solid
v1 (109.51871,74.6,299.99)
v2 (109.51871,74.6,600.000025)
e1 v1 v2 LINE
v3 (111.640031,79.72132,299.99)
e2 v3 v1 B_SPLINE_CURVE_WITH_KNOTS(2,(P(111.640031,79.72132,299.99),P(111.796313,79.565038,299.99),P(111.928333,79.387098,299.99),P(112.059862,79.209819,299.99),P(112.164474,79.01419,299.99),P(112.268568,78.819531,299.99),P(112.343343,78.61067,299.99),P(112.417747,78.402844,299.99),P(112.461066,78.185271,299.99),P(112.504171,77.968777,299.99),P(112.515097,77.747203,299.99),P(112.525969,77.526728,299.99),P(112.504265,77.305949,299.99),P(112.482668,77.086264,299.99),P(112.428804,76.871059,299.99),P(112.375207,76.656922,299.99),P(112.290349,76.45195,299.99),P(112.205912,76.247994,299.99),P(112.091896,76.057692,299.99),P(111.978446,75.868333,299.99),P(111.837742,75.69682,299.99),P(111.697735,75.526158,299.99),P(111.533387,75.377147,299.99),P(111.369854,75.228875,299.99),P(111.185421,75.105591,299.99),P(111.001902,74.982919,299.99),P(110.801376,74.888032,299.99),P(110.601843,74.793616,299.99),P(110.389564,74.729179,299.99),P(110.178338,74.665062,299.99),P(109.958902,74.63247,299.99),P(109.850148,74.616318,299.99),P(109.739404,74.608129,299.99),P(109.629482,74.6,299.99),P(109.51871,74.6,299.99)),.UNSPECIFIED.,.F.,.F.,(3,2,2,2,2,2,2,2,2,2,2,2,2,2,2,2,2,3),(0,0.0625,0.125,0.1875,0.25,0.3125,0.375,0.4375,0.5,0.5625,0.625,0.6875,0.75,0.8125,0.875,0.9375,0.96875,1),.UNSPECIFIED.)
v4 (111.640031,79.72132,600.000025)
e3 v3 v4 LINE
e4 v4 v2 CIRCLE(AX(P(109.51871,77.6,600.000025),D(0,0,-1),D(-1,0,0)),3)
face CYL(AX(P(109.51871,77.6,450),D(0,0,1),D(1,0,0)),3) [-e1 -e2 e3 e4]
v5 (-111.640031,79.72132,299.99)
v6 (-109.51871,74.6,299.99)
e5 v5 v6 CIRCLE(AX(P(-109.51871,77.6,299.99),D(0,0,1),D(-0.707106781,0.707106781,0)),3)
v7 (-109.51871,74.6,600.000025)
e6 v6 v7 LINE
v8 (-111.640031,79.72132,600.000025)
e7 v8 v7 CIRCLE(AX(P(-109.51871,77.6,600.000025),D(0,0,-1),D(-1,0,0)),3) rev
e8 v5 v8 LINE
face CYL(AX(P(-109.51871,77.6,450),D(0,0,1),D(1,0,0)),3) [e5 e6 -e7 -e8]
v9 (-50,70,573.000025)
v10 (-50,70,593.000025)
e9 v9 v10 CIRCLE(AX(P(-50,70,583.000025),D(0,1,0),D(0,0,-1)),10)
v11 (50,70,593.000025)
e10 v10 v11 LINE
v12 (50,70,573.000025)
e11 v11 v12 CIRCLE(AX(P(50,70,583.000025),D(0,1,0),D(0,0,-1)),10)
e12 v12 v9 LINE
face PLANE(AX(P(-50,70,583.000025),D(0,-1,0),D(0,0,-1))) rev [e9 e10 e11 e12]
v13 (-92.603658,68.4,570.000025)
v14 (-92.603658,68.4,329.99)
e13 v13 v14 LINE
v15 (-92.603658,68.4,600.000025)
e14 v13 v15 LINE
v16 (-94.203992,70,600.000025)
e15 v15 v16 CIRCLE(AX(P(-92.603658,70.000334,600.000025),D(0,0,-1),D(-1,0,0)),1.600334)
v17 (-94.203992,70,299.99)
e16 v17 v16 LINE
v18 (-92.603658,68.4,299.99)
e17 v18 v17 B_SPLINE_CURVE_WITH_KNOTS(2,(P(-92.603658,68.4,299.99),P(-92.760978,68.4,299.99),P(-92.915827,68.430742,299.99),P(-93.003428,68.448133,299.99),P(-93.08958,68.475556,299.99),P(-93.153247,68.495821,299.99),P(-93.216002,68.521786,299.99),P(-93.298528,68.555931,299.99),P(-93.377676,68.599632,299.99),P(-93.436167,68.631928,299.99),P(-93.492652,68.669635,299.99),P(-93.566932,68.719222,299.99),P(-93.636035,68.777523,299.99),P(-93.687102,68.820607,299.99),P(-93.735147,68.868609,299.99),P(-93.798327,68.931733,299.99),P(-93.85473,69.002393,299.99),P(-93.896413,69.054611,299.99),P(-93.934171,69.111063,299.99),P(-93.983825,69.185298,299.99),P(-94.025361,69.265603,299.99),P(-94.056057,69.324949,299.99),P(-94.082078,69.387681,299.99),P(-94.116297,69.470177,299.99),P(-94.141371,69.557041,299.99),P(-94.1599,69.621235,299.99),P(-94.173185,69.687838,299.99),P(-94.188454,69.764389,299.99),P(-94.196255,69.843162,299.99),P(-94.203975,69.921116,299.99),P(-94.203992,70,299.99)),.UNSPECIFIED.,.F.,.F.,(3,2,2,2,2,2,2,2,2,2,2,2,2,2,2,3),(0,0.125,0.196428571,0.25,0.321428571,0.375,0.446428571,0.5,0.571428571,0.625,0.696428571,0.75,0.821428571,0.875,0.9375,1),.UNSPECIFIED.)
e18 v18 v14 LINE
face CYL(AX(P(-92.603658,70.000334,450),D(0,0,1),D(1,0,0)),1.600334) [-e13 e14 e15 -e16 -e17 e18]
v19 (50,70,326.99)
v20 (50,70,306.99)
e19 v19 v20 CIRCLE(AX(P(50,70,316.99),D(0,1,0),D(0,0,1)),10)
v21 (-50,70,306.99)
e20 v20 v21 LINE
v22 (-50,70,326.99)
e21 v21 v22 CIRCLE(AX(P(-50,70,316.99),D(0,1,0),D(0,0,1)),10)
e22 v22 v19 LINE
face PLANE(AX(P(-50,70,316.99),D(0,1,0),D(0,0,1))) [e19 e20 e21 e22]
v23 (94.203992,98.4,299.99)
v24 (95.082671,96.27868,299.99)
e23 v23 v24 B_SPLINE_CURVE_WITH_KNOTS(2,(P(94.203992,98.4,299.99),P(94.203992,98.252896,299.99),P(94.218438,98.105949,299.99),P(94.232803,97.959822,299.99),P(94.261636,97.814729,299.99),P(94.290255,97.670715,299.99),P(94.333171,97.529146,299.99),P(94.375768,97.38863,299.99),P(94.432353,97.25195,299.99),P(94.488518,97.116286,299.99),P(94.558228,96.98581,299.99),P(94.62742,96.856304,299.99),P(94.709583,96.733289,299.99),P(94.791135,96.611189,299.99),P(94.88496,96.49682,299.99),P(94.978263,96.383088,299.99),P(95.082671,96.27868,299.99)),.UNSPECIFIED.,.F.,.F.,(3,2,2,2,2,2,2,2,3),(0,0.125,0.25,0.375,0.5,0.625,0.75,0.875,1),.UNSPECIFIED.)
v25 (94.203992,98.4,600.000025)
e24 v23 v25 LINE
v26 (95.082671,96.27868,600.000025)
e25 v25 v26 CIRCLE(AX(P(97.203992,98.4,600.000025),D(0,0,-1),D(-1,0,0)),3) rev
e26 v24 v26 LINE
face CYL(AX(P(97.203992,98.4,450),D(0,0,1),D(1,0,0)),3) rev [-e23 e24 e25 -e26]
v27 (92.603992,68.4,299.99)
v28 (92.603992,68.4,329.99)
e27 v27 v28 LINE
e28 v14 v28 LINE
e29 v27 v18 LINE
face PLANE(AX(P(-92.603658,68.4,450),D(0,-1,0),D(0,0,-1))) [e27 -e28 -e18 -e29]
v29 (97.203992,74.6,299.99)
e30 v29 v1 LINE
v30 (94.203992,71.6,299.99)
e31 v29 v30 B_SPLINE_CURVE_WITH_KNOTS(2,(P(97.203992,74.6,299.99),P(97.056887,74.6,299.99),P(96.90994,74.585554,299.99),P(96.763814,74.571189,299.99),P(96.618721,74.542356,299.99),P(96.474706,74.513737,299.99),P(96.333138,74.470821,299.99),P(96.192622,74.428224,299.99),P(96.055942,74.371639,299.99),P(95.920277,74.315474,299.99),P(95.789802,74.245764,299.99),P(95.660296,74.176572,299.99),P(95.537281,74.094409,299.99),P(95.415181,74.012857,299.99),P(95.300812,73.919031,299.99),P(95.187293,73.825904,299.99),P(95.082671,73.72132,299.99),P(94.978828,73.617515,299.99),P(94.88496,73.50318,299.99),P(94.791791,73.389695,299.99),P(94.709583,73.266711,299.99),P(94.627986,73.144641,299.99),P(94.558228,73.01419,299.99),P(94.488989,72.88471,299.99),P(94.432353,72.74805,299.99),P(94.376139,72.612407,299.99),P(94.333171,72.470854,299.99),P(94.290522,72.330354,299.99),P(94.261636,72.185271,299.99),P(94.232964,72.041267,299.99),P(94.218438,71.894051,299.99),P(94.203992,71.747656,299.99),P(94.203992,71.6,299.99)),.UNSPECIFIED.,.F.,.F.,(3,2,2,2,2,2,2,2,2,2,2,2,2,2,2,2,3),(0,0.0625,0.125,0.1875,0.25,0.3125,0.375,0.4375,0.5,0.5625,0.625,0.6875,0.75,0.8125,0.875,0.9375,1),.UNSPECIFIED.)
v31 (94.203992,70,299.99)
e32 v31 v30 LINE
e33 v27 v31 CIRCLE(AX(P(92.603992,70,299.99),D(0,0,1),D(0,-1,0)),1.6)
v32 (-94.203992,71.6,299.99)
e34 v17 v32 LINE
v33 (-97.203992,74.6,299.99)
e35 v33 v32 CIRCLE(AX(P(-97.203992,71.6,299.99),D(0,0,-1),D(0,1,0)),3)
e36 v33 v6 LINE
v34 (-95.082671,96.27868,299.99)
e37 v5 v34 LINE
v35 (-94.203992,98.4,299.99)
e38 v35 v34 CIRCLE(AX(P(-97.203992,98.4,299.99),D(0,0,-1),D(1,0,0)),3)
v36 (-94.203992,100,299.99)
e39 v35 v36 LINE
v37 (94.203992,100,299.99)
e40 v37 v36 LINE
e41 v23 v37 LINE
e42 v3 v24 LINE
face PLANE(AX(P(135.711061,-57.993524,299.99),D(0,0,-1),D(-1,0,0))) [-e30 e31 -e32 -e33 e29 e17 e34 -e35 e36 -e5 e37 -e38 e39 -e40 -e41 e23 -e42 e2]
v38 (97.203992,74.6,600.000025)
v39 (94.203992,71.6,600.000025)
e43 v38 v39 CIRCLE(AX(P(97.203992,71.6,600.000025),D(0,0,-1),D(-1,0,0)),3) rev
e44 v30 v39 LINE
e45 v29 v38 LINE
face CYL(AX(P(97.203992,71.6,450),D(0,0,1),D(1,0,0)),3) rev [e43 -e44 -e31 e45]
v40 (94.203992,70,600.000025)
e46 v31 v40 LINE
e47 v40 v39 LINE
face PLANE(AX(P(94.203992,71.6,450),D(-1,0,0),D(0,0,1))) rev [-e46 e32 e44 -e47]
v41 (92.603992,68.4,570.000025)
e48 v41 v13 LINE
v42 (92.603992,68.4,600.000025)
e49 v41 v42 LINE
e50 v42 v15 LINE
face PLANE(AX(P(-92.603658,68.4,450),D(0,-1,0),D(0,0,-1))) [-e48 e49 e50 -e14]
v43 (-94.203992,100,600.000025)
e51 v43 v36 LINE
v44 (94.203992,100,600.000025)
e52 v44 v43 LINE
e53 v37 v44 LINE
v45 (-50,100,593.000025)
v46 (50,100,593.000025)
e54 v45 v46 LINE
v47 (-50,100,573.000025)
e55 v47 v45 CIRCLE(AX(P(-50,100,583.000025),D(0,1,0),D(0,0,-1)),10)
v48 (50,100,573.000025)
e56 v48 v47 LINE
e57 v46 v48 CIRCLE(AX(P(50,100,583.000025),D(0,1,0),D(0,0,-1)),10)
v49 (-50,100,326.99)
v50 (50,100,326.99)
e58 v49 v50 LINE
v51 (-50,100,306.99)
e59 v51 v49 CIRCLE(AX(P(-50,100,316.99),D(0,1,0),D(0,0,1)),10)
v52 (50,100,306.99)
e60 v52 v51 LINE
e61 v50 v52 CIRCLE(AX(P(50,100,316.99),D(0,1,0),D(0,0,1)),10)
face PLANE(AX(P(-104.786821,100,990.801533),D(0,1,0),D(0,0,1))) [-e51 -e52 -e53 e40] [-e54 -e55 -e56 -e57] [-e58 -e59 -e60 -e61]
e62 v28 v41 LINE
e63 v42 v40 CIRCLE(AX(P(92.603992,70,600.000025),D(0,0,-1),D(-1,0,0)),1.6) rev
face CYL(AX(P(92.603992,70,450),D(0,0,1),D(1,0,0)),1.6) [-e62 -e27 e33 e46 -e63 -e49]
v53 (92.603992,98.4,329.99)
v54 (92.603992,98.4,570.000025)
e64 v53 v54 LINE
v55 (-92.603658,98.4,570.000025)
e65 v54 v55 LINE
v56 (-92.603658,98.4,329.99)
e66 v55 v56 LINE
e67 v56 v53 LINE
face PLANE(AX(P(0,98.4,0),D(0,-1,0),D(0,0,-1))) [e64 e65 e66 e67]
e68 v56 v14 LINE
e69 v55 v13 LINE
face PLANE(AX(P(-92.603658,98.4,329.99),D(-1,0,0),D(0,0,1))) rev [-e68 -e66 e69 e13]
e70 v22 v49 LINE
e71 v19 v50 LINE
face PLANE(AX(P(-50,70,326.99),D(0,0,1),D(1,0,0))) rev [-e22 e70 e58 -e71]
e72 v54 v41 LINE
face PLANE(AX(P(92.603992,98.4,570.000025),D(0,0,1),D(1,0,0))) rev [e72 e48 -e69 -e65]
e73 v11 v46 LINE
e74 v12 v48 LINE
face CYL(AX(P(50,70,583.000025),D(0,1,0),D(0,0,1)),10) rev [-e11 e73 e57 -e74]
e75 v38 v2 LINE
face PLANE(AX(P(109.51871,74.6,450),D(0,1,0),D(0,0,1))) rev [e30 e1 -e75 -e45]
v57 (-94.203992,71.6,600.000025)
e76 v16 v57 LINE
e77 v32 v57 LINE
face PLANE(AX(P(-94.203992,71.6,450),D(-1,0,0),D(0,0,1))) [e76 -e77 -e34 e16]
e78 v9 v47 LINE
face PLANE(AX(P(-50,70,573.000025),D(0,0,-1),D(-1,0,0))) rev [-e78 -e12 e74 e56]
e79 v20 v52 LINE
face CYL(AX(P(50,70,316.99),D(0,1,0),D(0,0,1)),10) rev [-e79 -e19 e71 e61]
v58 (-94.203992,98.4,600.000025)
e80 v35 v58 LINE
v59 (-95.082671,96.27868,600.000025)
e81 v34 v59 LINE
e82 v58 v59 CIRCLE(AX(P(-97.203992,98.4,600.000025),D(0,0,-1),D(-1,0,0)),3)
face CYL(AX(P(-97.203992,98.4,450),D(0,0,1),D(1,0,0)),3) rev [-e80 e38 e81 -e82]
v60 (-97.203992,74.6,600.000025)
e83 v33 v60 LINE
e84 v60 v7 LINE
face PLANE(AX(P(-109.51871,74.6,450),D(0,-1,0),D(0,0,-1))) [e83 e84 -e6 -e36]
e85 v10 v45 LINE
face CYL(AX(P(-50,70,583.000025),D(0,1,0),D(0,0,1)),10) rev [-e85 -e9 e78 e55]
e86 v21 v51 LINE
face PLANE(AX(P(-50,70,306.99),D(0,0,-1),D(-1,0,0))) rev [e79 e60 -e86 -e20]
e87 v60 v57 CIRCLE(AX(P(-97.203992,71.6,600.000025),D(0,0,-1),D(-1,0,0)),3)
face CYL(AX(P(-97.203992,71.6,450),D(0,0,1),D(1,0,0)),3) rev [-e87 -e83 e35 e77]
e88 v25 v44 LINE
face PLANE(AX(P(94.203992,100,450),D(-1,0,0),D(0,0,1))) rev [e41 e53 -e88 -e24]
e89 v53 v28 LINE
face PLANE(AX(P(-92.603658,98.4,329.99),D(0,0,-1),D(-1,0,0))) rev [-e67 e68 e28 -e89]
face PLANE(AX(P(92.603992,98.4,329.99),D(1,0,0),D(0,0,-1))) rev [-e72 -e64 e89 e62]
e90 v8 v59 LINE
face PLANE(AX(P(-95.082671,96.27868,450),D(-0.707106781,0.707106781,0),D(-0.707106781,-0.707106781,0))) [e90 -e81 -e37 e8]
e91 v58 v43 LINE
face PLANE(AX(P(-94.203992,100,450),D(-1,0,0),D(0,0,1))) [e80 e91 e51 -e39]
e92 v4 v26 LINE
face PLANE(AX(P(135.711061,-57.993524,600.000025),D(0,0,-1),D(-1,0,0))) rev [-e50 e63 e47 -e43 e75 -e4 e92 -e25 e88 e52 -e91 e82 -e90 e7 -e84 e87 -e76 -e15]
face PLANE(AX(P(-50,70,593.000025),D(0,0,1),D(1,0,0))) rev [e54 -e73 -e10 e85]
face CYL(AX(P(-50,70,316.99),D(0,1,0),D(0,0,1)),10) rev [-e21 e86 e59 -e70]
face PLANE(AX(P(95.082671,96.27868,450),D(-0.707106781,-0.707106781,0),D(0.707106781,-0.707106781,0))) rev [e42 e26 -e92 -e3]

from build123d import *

# Parameters (mm, degrees)
STOCK_PAYLOAD_BAY_1_START = 299.99
STOCK_PAYLOAD_BAY_1_DEPTH = 300.010025
CUT_EXTRUDE2_DEPTH        = 30
SKETCH1_W                 = 185.207649842
SKETCH1_H                 = 240.010025
CUT_EXTRUDE1_DEPTH        = 30


# Read off the part's stored shape, not the designer's step: Stock-Payload_bay-1
with BuildPart() as part:
    # Stock-Payload_bay-1 outline → Stock-Payload_bay-1 (new body)
    with BuildSketch(Plane.XY.offset(STOCK_PAYLOAD_BAY_1_START)):
        with BuildLine():
            Line((94.203991807, 98.4), (94.203991807, 100))
            Line((94.203991807, 100), (-94.203991807, 100))
            Line((-94.203991807, 100), (-94.203991807, 98.4))
            ThreePointArc((-94.203991807, 98.4), (-94.43235321, 97.251949701), (-95.082671465, 96.278679653))
            Line((-95.082671465, 96.278679653), (-111.640030762, 79.721320356))
            ThreePointArc((-111.640030762, 79.721320356), (-112.290349017, 76.45194971), (-109.518710415, 74.600000005))
            Line((-109.518710415, 74.600000005), (-97.203991812, 74.600000005))
            ThreePointArc((-97.203991812, 74.600000005), (-95.082671465, 73.721320347), (-94.203991807, 71.6))
            Line((-94.203991807, 71.6), (-94.203991807, 70))
            ThreePointArc((-94.203991807, 70), (-93.735146897, 68.868608907), (-92.603658035, 68.4))
            Line((-92.603658035, 68.4), (92.603991807, 68.4))
            ThreePointArc((92.603991807, 68.4), (93.735362657, 68.86862915), (94.203991807, 70))
            Line((94.203991807, 70), (94.203991807, 71.6))
            ThreePointArc((94.203991807, 71.6), (95.082671465, 73.721320347), (97.203991812, 74.600000005))
            Line((97.203991812, 74.600000005), (109.518710415, 74.600000005))
            ThreePointArc((109.518710415, 74.600000005), (112.290349017, 76.45194971), (111.640030762, 79.721320356))
            Line((111.640030762, 79.721320356), (95.082671465, 96.278679653))
            ThreePointArc((95.082671465, 96.278679653), (94.43235321, 97.251949701), (94.203991807, 98.4))
        make_face()
    extrude(amount=STOCK_PAYLOAD_BAY_1_DEPTH)

    # Sketch2 → Cut-Extrude2 (cut)
    with BuildSketch(Plane(origin=(0, 100, 0), x_dir=(1, 0, 0), z_dir=(0, 1, 0))):
        with BuildLine():
            Line((-50, -306.99), (50, -306.99))
            ThreePointArc((50, -306.99), (60, -316.99), (50, -326.99))
            Line((50, -326.99), (-50, -326.99))
            ThreePointArc((-50, -326.99), (-60, -316.99), (-50, -306.99))
        make_face()
        with BuildLine():
            Line((-50, -593.000025), (50, -593.000025))
            ThreePointArc((50, -593.000025), (60, -583.000025), (50, -573.000025))
            Line((50, -573.000025), (-50, -573.000025))
            ThreePointArc((-50, -573.000025), (-60, -583.000025), (-50, -593.000025))
        make_face()
    extrude(amount=-CUT_EXTRUDE2_DEPTH, mode=Mode.SUBTRACT)

    # Sketch1 → Cut-Extrude1 (cut)
    with BuildSketch(Plane(origin=(0, 68.4, 0), x_dir=(-1, 0, 0), z_dir=(0, -1, 0))):
        with Locations((-0.000166886, -449.9950125)):
            Rectangle(SKETCH1_W, SKETCH1_H)
    extrude(amount=-CUT_EXTRUDE1_DEPTH, mode=Mode.SUBTRACT)


solid = part.part
